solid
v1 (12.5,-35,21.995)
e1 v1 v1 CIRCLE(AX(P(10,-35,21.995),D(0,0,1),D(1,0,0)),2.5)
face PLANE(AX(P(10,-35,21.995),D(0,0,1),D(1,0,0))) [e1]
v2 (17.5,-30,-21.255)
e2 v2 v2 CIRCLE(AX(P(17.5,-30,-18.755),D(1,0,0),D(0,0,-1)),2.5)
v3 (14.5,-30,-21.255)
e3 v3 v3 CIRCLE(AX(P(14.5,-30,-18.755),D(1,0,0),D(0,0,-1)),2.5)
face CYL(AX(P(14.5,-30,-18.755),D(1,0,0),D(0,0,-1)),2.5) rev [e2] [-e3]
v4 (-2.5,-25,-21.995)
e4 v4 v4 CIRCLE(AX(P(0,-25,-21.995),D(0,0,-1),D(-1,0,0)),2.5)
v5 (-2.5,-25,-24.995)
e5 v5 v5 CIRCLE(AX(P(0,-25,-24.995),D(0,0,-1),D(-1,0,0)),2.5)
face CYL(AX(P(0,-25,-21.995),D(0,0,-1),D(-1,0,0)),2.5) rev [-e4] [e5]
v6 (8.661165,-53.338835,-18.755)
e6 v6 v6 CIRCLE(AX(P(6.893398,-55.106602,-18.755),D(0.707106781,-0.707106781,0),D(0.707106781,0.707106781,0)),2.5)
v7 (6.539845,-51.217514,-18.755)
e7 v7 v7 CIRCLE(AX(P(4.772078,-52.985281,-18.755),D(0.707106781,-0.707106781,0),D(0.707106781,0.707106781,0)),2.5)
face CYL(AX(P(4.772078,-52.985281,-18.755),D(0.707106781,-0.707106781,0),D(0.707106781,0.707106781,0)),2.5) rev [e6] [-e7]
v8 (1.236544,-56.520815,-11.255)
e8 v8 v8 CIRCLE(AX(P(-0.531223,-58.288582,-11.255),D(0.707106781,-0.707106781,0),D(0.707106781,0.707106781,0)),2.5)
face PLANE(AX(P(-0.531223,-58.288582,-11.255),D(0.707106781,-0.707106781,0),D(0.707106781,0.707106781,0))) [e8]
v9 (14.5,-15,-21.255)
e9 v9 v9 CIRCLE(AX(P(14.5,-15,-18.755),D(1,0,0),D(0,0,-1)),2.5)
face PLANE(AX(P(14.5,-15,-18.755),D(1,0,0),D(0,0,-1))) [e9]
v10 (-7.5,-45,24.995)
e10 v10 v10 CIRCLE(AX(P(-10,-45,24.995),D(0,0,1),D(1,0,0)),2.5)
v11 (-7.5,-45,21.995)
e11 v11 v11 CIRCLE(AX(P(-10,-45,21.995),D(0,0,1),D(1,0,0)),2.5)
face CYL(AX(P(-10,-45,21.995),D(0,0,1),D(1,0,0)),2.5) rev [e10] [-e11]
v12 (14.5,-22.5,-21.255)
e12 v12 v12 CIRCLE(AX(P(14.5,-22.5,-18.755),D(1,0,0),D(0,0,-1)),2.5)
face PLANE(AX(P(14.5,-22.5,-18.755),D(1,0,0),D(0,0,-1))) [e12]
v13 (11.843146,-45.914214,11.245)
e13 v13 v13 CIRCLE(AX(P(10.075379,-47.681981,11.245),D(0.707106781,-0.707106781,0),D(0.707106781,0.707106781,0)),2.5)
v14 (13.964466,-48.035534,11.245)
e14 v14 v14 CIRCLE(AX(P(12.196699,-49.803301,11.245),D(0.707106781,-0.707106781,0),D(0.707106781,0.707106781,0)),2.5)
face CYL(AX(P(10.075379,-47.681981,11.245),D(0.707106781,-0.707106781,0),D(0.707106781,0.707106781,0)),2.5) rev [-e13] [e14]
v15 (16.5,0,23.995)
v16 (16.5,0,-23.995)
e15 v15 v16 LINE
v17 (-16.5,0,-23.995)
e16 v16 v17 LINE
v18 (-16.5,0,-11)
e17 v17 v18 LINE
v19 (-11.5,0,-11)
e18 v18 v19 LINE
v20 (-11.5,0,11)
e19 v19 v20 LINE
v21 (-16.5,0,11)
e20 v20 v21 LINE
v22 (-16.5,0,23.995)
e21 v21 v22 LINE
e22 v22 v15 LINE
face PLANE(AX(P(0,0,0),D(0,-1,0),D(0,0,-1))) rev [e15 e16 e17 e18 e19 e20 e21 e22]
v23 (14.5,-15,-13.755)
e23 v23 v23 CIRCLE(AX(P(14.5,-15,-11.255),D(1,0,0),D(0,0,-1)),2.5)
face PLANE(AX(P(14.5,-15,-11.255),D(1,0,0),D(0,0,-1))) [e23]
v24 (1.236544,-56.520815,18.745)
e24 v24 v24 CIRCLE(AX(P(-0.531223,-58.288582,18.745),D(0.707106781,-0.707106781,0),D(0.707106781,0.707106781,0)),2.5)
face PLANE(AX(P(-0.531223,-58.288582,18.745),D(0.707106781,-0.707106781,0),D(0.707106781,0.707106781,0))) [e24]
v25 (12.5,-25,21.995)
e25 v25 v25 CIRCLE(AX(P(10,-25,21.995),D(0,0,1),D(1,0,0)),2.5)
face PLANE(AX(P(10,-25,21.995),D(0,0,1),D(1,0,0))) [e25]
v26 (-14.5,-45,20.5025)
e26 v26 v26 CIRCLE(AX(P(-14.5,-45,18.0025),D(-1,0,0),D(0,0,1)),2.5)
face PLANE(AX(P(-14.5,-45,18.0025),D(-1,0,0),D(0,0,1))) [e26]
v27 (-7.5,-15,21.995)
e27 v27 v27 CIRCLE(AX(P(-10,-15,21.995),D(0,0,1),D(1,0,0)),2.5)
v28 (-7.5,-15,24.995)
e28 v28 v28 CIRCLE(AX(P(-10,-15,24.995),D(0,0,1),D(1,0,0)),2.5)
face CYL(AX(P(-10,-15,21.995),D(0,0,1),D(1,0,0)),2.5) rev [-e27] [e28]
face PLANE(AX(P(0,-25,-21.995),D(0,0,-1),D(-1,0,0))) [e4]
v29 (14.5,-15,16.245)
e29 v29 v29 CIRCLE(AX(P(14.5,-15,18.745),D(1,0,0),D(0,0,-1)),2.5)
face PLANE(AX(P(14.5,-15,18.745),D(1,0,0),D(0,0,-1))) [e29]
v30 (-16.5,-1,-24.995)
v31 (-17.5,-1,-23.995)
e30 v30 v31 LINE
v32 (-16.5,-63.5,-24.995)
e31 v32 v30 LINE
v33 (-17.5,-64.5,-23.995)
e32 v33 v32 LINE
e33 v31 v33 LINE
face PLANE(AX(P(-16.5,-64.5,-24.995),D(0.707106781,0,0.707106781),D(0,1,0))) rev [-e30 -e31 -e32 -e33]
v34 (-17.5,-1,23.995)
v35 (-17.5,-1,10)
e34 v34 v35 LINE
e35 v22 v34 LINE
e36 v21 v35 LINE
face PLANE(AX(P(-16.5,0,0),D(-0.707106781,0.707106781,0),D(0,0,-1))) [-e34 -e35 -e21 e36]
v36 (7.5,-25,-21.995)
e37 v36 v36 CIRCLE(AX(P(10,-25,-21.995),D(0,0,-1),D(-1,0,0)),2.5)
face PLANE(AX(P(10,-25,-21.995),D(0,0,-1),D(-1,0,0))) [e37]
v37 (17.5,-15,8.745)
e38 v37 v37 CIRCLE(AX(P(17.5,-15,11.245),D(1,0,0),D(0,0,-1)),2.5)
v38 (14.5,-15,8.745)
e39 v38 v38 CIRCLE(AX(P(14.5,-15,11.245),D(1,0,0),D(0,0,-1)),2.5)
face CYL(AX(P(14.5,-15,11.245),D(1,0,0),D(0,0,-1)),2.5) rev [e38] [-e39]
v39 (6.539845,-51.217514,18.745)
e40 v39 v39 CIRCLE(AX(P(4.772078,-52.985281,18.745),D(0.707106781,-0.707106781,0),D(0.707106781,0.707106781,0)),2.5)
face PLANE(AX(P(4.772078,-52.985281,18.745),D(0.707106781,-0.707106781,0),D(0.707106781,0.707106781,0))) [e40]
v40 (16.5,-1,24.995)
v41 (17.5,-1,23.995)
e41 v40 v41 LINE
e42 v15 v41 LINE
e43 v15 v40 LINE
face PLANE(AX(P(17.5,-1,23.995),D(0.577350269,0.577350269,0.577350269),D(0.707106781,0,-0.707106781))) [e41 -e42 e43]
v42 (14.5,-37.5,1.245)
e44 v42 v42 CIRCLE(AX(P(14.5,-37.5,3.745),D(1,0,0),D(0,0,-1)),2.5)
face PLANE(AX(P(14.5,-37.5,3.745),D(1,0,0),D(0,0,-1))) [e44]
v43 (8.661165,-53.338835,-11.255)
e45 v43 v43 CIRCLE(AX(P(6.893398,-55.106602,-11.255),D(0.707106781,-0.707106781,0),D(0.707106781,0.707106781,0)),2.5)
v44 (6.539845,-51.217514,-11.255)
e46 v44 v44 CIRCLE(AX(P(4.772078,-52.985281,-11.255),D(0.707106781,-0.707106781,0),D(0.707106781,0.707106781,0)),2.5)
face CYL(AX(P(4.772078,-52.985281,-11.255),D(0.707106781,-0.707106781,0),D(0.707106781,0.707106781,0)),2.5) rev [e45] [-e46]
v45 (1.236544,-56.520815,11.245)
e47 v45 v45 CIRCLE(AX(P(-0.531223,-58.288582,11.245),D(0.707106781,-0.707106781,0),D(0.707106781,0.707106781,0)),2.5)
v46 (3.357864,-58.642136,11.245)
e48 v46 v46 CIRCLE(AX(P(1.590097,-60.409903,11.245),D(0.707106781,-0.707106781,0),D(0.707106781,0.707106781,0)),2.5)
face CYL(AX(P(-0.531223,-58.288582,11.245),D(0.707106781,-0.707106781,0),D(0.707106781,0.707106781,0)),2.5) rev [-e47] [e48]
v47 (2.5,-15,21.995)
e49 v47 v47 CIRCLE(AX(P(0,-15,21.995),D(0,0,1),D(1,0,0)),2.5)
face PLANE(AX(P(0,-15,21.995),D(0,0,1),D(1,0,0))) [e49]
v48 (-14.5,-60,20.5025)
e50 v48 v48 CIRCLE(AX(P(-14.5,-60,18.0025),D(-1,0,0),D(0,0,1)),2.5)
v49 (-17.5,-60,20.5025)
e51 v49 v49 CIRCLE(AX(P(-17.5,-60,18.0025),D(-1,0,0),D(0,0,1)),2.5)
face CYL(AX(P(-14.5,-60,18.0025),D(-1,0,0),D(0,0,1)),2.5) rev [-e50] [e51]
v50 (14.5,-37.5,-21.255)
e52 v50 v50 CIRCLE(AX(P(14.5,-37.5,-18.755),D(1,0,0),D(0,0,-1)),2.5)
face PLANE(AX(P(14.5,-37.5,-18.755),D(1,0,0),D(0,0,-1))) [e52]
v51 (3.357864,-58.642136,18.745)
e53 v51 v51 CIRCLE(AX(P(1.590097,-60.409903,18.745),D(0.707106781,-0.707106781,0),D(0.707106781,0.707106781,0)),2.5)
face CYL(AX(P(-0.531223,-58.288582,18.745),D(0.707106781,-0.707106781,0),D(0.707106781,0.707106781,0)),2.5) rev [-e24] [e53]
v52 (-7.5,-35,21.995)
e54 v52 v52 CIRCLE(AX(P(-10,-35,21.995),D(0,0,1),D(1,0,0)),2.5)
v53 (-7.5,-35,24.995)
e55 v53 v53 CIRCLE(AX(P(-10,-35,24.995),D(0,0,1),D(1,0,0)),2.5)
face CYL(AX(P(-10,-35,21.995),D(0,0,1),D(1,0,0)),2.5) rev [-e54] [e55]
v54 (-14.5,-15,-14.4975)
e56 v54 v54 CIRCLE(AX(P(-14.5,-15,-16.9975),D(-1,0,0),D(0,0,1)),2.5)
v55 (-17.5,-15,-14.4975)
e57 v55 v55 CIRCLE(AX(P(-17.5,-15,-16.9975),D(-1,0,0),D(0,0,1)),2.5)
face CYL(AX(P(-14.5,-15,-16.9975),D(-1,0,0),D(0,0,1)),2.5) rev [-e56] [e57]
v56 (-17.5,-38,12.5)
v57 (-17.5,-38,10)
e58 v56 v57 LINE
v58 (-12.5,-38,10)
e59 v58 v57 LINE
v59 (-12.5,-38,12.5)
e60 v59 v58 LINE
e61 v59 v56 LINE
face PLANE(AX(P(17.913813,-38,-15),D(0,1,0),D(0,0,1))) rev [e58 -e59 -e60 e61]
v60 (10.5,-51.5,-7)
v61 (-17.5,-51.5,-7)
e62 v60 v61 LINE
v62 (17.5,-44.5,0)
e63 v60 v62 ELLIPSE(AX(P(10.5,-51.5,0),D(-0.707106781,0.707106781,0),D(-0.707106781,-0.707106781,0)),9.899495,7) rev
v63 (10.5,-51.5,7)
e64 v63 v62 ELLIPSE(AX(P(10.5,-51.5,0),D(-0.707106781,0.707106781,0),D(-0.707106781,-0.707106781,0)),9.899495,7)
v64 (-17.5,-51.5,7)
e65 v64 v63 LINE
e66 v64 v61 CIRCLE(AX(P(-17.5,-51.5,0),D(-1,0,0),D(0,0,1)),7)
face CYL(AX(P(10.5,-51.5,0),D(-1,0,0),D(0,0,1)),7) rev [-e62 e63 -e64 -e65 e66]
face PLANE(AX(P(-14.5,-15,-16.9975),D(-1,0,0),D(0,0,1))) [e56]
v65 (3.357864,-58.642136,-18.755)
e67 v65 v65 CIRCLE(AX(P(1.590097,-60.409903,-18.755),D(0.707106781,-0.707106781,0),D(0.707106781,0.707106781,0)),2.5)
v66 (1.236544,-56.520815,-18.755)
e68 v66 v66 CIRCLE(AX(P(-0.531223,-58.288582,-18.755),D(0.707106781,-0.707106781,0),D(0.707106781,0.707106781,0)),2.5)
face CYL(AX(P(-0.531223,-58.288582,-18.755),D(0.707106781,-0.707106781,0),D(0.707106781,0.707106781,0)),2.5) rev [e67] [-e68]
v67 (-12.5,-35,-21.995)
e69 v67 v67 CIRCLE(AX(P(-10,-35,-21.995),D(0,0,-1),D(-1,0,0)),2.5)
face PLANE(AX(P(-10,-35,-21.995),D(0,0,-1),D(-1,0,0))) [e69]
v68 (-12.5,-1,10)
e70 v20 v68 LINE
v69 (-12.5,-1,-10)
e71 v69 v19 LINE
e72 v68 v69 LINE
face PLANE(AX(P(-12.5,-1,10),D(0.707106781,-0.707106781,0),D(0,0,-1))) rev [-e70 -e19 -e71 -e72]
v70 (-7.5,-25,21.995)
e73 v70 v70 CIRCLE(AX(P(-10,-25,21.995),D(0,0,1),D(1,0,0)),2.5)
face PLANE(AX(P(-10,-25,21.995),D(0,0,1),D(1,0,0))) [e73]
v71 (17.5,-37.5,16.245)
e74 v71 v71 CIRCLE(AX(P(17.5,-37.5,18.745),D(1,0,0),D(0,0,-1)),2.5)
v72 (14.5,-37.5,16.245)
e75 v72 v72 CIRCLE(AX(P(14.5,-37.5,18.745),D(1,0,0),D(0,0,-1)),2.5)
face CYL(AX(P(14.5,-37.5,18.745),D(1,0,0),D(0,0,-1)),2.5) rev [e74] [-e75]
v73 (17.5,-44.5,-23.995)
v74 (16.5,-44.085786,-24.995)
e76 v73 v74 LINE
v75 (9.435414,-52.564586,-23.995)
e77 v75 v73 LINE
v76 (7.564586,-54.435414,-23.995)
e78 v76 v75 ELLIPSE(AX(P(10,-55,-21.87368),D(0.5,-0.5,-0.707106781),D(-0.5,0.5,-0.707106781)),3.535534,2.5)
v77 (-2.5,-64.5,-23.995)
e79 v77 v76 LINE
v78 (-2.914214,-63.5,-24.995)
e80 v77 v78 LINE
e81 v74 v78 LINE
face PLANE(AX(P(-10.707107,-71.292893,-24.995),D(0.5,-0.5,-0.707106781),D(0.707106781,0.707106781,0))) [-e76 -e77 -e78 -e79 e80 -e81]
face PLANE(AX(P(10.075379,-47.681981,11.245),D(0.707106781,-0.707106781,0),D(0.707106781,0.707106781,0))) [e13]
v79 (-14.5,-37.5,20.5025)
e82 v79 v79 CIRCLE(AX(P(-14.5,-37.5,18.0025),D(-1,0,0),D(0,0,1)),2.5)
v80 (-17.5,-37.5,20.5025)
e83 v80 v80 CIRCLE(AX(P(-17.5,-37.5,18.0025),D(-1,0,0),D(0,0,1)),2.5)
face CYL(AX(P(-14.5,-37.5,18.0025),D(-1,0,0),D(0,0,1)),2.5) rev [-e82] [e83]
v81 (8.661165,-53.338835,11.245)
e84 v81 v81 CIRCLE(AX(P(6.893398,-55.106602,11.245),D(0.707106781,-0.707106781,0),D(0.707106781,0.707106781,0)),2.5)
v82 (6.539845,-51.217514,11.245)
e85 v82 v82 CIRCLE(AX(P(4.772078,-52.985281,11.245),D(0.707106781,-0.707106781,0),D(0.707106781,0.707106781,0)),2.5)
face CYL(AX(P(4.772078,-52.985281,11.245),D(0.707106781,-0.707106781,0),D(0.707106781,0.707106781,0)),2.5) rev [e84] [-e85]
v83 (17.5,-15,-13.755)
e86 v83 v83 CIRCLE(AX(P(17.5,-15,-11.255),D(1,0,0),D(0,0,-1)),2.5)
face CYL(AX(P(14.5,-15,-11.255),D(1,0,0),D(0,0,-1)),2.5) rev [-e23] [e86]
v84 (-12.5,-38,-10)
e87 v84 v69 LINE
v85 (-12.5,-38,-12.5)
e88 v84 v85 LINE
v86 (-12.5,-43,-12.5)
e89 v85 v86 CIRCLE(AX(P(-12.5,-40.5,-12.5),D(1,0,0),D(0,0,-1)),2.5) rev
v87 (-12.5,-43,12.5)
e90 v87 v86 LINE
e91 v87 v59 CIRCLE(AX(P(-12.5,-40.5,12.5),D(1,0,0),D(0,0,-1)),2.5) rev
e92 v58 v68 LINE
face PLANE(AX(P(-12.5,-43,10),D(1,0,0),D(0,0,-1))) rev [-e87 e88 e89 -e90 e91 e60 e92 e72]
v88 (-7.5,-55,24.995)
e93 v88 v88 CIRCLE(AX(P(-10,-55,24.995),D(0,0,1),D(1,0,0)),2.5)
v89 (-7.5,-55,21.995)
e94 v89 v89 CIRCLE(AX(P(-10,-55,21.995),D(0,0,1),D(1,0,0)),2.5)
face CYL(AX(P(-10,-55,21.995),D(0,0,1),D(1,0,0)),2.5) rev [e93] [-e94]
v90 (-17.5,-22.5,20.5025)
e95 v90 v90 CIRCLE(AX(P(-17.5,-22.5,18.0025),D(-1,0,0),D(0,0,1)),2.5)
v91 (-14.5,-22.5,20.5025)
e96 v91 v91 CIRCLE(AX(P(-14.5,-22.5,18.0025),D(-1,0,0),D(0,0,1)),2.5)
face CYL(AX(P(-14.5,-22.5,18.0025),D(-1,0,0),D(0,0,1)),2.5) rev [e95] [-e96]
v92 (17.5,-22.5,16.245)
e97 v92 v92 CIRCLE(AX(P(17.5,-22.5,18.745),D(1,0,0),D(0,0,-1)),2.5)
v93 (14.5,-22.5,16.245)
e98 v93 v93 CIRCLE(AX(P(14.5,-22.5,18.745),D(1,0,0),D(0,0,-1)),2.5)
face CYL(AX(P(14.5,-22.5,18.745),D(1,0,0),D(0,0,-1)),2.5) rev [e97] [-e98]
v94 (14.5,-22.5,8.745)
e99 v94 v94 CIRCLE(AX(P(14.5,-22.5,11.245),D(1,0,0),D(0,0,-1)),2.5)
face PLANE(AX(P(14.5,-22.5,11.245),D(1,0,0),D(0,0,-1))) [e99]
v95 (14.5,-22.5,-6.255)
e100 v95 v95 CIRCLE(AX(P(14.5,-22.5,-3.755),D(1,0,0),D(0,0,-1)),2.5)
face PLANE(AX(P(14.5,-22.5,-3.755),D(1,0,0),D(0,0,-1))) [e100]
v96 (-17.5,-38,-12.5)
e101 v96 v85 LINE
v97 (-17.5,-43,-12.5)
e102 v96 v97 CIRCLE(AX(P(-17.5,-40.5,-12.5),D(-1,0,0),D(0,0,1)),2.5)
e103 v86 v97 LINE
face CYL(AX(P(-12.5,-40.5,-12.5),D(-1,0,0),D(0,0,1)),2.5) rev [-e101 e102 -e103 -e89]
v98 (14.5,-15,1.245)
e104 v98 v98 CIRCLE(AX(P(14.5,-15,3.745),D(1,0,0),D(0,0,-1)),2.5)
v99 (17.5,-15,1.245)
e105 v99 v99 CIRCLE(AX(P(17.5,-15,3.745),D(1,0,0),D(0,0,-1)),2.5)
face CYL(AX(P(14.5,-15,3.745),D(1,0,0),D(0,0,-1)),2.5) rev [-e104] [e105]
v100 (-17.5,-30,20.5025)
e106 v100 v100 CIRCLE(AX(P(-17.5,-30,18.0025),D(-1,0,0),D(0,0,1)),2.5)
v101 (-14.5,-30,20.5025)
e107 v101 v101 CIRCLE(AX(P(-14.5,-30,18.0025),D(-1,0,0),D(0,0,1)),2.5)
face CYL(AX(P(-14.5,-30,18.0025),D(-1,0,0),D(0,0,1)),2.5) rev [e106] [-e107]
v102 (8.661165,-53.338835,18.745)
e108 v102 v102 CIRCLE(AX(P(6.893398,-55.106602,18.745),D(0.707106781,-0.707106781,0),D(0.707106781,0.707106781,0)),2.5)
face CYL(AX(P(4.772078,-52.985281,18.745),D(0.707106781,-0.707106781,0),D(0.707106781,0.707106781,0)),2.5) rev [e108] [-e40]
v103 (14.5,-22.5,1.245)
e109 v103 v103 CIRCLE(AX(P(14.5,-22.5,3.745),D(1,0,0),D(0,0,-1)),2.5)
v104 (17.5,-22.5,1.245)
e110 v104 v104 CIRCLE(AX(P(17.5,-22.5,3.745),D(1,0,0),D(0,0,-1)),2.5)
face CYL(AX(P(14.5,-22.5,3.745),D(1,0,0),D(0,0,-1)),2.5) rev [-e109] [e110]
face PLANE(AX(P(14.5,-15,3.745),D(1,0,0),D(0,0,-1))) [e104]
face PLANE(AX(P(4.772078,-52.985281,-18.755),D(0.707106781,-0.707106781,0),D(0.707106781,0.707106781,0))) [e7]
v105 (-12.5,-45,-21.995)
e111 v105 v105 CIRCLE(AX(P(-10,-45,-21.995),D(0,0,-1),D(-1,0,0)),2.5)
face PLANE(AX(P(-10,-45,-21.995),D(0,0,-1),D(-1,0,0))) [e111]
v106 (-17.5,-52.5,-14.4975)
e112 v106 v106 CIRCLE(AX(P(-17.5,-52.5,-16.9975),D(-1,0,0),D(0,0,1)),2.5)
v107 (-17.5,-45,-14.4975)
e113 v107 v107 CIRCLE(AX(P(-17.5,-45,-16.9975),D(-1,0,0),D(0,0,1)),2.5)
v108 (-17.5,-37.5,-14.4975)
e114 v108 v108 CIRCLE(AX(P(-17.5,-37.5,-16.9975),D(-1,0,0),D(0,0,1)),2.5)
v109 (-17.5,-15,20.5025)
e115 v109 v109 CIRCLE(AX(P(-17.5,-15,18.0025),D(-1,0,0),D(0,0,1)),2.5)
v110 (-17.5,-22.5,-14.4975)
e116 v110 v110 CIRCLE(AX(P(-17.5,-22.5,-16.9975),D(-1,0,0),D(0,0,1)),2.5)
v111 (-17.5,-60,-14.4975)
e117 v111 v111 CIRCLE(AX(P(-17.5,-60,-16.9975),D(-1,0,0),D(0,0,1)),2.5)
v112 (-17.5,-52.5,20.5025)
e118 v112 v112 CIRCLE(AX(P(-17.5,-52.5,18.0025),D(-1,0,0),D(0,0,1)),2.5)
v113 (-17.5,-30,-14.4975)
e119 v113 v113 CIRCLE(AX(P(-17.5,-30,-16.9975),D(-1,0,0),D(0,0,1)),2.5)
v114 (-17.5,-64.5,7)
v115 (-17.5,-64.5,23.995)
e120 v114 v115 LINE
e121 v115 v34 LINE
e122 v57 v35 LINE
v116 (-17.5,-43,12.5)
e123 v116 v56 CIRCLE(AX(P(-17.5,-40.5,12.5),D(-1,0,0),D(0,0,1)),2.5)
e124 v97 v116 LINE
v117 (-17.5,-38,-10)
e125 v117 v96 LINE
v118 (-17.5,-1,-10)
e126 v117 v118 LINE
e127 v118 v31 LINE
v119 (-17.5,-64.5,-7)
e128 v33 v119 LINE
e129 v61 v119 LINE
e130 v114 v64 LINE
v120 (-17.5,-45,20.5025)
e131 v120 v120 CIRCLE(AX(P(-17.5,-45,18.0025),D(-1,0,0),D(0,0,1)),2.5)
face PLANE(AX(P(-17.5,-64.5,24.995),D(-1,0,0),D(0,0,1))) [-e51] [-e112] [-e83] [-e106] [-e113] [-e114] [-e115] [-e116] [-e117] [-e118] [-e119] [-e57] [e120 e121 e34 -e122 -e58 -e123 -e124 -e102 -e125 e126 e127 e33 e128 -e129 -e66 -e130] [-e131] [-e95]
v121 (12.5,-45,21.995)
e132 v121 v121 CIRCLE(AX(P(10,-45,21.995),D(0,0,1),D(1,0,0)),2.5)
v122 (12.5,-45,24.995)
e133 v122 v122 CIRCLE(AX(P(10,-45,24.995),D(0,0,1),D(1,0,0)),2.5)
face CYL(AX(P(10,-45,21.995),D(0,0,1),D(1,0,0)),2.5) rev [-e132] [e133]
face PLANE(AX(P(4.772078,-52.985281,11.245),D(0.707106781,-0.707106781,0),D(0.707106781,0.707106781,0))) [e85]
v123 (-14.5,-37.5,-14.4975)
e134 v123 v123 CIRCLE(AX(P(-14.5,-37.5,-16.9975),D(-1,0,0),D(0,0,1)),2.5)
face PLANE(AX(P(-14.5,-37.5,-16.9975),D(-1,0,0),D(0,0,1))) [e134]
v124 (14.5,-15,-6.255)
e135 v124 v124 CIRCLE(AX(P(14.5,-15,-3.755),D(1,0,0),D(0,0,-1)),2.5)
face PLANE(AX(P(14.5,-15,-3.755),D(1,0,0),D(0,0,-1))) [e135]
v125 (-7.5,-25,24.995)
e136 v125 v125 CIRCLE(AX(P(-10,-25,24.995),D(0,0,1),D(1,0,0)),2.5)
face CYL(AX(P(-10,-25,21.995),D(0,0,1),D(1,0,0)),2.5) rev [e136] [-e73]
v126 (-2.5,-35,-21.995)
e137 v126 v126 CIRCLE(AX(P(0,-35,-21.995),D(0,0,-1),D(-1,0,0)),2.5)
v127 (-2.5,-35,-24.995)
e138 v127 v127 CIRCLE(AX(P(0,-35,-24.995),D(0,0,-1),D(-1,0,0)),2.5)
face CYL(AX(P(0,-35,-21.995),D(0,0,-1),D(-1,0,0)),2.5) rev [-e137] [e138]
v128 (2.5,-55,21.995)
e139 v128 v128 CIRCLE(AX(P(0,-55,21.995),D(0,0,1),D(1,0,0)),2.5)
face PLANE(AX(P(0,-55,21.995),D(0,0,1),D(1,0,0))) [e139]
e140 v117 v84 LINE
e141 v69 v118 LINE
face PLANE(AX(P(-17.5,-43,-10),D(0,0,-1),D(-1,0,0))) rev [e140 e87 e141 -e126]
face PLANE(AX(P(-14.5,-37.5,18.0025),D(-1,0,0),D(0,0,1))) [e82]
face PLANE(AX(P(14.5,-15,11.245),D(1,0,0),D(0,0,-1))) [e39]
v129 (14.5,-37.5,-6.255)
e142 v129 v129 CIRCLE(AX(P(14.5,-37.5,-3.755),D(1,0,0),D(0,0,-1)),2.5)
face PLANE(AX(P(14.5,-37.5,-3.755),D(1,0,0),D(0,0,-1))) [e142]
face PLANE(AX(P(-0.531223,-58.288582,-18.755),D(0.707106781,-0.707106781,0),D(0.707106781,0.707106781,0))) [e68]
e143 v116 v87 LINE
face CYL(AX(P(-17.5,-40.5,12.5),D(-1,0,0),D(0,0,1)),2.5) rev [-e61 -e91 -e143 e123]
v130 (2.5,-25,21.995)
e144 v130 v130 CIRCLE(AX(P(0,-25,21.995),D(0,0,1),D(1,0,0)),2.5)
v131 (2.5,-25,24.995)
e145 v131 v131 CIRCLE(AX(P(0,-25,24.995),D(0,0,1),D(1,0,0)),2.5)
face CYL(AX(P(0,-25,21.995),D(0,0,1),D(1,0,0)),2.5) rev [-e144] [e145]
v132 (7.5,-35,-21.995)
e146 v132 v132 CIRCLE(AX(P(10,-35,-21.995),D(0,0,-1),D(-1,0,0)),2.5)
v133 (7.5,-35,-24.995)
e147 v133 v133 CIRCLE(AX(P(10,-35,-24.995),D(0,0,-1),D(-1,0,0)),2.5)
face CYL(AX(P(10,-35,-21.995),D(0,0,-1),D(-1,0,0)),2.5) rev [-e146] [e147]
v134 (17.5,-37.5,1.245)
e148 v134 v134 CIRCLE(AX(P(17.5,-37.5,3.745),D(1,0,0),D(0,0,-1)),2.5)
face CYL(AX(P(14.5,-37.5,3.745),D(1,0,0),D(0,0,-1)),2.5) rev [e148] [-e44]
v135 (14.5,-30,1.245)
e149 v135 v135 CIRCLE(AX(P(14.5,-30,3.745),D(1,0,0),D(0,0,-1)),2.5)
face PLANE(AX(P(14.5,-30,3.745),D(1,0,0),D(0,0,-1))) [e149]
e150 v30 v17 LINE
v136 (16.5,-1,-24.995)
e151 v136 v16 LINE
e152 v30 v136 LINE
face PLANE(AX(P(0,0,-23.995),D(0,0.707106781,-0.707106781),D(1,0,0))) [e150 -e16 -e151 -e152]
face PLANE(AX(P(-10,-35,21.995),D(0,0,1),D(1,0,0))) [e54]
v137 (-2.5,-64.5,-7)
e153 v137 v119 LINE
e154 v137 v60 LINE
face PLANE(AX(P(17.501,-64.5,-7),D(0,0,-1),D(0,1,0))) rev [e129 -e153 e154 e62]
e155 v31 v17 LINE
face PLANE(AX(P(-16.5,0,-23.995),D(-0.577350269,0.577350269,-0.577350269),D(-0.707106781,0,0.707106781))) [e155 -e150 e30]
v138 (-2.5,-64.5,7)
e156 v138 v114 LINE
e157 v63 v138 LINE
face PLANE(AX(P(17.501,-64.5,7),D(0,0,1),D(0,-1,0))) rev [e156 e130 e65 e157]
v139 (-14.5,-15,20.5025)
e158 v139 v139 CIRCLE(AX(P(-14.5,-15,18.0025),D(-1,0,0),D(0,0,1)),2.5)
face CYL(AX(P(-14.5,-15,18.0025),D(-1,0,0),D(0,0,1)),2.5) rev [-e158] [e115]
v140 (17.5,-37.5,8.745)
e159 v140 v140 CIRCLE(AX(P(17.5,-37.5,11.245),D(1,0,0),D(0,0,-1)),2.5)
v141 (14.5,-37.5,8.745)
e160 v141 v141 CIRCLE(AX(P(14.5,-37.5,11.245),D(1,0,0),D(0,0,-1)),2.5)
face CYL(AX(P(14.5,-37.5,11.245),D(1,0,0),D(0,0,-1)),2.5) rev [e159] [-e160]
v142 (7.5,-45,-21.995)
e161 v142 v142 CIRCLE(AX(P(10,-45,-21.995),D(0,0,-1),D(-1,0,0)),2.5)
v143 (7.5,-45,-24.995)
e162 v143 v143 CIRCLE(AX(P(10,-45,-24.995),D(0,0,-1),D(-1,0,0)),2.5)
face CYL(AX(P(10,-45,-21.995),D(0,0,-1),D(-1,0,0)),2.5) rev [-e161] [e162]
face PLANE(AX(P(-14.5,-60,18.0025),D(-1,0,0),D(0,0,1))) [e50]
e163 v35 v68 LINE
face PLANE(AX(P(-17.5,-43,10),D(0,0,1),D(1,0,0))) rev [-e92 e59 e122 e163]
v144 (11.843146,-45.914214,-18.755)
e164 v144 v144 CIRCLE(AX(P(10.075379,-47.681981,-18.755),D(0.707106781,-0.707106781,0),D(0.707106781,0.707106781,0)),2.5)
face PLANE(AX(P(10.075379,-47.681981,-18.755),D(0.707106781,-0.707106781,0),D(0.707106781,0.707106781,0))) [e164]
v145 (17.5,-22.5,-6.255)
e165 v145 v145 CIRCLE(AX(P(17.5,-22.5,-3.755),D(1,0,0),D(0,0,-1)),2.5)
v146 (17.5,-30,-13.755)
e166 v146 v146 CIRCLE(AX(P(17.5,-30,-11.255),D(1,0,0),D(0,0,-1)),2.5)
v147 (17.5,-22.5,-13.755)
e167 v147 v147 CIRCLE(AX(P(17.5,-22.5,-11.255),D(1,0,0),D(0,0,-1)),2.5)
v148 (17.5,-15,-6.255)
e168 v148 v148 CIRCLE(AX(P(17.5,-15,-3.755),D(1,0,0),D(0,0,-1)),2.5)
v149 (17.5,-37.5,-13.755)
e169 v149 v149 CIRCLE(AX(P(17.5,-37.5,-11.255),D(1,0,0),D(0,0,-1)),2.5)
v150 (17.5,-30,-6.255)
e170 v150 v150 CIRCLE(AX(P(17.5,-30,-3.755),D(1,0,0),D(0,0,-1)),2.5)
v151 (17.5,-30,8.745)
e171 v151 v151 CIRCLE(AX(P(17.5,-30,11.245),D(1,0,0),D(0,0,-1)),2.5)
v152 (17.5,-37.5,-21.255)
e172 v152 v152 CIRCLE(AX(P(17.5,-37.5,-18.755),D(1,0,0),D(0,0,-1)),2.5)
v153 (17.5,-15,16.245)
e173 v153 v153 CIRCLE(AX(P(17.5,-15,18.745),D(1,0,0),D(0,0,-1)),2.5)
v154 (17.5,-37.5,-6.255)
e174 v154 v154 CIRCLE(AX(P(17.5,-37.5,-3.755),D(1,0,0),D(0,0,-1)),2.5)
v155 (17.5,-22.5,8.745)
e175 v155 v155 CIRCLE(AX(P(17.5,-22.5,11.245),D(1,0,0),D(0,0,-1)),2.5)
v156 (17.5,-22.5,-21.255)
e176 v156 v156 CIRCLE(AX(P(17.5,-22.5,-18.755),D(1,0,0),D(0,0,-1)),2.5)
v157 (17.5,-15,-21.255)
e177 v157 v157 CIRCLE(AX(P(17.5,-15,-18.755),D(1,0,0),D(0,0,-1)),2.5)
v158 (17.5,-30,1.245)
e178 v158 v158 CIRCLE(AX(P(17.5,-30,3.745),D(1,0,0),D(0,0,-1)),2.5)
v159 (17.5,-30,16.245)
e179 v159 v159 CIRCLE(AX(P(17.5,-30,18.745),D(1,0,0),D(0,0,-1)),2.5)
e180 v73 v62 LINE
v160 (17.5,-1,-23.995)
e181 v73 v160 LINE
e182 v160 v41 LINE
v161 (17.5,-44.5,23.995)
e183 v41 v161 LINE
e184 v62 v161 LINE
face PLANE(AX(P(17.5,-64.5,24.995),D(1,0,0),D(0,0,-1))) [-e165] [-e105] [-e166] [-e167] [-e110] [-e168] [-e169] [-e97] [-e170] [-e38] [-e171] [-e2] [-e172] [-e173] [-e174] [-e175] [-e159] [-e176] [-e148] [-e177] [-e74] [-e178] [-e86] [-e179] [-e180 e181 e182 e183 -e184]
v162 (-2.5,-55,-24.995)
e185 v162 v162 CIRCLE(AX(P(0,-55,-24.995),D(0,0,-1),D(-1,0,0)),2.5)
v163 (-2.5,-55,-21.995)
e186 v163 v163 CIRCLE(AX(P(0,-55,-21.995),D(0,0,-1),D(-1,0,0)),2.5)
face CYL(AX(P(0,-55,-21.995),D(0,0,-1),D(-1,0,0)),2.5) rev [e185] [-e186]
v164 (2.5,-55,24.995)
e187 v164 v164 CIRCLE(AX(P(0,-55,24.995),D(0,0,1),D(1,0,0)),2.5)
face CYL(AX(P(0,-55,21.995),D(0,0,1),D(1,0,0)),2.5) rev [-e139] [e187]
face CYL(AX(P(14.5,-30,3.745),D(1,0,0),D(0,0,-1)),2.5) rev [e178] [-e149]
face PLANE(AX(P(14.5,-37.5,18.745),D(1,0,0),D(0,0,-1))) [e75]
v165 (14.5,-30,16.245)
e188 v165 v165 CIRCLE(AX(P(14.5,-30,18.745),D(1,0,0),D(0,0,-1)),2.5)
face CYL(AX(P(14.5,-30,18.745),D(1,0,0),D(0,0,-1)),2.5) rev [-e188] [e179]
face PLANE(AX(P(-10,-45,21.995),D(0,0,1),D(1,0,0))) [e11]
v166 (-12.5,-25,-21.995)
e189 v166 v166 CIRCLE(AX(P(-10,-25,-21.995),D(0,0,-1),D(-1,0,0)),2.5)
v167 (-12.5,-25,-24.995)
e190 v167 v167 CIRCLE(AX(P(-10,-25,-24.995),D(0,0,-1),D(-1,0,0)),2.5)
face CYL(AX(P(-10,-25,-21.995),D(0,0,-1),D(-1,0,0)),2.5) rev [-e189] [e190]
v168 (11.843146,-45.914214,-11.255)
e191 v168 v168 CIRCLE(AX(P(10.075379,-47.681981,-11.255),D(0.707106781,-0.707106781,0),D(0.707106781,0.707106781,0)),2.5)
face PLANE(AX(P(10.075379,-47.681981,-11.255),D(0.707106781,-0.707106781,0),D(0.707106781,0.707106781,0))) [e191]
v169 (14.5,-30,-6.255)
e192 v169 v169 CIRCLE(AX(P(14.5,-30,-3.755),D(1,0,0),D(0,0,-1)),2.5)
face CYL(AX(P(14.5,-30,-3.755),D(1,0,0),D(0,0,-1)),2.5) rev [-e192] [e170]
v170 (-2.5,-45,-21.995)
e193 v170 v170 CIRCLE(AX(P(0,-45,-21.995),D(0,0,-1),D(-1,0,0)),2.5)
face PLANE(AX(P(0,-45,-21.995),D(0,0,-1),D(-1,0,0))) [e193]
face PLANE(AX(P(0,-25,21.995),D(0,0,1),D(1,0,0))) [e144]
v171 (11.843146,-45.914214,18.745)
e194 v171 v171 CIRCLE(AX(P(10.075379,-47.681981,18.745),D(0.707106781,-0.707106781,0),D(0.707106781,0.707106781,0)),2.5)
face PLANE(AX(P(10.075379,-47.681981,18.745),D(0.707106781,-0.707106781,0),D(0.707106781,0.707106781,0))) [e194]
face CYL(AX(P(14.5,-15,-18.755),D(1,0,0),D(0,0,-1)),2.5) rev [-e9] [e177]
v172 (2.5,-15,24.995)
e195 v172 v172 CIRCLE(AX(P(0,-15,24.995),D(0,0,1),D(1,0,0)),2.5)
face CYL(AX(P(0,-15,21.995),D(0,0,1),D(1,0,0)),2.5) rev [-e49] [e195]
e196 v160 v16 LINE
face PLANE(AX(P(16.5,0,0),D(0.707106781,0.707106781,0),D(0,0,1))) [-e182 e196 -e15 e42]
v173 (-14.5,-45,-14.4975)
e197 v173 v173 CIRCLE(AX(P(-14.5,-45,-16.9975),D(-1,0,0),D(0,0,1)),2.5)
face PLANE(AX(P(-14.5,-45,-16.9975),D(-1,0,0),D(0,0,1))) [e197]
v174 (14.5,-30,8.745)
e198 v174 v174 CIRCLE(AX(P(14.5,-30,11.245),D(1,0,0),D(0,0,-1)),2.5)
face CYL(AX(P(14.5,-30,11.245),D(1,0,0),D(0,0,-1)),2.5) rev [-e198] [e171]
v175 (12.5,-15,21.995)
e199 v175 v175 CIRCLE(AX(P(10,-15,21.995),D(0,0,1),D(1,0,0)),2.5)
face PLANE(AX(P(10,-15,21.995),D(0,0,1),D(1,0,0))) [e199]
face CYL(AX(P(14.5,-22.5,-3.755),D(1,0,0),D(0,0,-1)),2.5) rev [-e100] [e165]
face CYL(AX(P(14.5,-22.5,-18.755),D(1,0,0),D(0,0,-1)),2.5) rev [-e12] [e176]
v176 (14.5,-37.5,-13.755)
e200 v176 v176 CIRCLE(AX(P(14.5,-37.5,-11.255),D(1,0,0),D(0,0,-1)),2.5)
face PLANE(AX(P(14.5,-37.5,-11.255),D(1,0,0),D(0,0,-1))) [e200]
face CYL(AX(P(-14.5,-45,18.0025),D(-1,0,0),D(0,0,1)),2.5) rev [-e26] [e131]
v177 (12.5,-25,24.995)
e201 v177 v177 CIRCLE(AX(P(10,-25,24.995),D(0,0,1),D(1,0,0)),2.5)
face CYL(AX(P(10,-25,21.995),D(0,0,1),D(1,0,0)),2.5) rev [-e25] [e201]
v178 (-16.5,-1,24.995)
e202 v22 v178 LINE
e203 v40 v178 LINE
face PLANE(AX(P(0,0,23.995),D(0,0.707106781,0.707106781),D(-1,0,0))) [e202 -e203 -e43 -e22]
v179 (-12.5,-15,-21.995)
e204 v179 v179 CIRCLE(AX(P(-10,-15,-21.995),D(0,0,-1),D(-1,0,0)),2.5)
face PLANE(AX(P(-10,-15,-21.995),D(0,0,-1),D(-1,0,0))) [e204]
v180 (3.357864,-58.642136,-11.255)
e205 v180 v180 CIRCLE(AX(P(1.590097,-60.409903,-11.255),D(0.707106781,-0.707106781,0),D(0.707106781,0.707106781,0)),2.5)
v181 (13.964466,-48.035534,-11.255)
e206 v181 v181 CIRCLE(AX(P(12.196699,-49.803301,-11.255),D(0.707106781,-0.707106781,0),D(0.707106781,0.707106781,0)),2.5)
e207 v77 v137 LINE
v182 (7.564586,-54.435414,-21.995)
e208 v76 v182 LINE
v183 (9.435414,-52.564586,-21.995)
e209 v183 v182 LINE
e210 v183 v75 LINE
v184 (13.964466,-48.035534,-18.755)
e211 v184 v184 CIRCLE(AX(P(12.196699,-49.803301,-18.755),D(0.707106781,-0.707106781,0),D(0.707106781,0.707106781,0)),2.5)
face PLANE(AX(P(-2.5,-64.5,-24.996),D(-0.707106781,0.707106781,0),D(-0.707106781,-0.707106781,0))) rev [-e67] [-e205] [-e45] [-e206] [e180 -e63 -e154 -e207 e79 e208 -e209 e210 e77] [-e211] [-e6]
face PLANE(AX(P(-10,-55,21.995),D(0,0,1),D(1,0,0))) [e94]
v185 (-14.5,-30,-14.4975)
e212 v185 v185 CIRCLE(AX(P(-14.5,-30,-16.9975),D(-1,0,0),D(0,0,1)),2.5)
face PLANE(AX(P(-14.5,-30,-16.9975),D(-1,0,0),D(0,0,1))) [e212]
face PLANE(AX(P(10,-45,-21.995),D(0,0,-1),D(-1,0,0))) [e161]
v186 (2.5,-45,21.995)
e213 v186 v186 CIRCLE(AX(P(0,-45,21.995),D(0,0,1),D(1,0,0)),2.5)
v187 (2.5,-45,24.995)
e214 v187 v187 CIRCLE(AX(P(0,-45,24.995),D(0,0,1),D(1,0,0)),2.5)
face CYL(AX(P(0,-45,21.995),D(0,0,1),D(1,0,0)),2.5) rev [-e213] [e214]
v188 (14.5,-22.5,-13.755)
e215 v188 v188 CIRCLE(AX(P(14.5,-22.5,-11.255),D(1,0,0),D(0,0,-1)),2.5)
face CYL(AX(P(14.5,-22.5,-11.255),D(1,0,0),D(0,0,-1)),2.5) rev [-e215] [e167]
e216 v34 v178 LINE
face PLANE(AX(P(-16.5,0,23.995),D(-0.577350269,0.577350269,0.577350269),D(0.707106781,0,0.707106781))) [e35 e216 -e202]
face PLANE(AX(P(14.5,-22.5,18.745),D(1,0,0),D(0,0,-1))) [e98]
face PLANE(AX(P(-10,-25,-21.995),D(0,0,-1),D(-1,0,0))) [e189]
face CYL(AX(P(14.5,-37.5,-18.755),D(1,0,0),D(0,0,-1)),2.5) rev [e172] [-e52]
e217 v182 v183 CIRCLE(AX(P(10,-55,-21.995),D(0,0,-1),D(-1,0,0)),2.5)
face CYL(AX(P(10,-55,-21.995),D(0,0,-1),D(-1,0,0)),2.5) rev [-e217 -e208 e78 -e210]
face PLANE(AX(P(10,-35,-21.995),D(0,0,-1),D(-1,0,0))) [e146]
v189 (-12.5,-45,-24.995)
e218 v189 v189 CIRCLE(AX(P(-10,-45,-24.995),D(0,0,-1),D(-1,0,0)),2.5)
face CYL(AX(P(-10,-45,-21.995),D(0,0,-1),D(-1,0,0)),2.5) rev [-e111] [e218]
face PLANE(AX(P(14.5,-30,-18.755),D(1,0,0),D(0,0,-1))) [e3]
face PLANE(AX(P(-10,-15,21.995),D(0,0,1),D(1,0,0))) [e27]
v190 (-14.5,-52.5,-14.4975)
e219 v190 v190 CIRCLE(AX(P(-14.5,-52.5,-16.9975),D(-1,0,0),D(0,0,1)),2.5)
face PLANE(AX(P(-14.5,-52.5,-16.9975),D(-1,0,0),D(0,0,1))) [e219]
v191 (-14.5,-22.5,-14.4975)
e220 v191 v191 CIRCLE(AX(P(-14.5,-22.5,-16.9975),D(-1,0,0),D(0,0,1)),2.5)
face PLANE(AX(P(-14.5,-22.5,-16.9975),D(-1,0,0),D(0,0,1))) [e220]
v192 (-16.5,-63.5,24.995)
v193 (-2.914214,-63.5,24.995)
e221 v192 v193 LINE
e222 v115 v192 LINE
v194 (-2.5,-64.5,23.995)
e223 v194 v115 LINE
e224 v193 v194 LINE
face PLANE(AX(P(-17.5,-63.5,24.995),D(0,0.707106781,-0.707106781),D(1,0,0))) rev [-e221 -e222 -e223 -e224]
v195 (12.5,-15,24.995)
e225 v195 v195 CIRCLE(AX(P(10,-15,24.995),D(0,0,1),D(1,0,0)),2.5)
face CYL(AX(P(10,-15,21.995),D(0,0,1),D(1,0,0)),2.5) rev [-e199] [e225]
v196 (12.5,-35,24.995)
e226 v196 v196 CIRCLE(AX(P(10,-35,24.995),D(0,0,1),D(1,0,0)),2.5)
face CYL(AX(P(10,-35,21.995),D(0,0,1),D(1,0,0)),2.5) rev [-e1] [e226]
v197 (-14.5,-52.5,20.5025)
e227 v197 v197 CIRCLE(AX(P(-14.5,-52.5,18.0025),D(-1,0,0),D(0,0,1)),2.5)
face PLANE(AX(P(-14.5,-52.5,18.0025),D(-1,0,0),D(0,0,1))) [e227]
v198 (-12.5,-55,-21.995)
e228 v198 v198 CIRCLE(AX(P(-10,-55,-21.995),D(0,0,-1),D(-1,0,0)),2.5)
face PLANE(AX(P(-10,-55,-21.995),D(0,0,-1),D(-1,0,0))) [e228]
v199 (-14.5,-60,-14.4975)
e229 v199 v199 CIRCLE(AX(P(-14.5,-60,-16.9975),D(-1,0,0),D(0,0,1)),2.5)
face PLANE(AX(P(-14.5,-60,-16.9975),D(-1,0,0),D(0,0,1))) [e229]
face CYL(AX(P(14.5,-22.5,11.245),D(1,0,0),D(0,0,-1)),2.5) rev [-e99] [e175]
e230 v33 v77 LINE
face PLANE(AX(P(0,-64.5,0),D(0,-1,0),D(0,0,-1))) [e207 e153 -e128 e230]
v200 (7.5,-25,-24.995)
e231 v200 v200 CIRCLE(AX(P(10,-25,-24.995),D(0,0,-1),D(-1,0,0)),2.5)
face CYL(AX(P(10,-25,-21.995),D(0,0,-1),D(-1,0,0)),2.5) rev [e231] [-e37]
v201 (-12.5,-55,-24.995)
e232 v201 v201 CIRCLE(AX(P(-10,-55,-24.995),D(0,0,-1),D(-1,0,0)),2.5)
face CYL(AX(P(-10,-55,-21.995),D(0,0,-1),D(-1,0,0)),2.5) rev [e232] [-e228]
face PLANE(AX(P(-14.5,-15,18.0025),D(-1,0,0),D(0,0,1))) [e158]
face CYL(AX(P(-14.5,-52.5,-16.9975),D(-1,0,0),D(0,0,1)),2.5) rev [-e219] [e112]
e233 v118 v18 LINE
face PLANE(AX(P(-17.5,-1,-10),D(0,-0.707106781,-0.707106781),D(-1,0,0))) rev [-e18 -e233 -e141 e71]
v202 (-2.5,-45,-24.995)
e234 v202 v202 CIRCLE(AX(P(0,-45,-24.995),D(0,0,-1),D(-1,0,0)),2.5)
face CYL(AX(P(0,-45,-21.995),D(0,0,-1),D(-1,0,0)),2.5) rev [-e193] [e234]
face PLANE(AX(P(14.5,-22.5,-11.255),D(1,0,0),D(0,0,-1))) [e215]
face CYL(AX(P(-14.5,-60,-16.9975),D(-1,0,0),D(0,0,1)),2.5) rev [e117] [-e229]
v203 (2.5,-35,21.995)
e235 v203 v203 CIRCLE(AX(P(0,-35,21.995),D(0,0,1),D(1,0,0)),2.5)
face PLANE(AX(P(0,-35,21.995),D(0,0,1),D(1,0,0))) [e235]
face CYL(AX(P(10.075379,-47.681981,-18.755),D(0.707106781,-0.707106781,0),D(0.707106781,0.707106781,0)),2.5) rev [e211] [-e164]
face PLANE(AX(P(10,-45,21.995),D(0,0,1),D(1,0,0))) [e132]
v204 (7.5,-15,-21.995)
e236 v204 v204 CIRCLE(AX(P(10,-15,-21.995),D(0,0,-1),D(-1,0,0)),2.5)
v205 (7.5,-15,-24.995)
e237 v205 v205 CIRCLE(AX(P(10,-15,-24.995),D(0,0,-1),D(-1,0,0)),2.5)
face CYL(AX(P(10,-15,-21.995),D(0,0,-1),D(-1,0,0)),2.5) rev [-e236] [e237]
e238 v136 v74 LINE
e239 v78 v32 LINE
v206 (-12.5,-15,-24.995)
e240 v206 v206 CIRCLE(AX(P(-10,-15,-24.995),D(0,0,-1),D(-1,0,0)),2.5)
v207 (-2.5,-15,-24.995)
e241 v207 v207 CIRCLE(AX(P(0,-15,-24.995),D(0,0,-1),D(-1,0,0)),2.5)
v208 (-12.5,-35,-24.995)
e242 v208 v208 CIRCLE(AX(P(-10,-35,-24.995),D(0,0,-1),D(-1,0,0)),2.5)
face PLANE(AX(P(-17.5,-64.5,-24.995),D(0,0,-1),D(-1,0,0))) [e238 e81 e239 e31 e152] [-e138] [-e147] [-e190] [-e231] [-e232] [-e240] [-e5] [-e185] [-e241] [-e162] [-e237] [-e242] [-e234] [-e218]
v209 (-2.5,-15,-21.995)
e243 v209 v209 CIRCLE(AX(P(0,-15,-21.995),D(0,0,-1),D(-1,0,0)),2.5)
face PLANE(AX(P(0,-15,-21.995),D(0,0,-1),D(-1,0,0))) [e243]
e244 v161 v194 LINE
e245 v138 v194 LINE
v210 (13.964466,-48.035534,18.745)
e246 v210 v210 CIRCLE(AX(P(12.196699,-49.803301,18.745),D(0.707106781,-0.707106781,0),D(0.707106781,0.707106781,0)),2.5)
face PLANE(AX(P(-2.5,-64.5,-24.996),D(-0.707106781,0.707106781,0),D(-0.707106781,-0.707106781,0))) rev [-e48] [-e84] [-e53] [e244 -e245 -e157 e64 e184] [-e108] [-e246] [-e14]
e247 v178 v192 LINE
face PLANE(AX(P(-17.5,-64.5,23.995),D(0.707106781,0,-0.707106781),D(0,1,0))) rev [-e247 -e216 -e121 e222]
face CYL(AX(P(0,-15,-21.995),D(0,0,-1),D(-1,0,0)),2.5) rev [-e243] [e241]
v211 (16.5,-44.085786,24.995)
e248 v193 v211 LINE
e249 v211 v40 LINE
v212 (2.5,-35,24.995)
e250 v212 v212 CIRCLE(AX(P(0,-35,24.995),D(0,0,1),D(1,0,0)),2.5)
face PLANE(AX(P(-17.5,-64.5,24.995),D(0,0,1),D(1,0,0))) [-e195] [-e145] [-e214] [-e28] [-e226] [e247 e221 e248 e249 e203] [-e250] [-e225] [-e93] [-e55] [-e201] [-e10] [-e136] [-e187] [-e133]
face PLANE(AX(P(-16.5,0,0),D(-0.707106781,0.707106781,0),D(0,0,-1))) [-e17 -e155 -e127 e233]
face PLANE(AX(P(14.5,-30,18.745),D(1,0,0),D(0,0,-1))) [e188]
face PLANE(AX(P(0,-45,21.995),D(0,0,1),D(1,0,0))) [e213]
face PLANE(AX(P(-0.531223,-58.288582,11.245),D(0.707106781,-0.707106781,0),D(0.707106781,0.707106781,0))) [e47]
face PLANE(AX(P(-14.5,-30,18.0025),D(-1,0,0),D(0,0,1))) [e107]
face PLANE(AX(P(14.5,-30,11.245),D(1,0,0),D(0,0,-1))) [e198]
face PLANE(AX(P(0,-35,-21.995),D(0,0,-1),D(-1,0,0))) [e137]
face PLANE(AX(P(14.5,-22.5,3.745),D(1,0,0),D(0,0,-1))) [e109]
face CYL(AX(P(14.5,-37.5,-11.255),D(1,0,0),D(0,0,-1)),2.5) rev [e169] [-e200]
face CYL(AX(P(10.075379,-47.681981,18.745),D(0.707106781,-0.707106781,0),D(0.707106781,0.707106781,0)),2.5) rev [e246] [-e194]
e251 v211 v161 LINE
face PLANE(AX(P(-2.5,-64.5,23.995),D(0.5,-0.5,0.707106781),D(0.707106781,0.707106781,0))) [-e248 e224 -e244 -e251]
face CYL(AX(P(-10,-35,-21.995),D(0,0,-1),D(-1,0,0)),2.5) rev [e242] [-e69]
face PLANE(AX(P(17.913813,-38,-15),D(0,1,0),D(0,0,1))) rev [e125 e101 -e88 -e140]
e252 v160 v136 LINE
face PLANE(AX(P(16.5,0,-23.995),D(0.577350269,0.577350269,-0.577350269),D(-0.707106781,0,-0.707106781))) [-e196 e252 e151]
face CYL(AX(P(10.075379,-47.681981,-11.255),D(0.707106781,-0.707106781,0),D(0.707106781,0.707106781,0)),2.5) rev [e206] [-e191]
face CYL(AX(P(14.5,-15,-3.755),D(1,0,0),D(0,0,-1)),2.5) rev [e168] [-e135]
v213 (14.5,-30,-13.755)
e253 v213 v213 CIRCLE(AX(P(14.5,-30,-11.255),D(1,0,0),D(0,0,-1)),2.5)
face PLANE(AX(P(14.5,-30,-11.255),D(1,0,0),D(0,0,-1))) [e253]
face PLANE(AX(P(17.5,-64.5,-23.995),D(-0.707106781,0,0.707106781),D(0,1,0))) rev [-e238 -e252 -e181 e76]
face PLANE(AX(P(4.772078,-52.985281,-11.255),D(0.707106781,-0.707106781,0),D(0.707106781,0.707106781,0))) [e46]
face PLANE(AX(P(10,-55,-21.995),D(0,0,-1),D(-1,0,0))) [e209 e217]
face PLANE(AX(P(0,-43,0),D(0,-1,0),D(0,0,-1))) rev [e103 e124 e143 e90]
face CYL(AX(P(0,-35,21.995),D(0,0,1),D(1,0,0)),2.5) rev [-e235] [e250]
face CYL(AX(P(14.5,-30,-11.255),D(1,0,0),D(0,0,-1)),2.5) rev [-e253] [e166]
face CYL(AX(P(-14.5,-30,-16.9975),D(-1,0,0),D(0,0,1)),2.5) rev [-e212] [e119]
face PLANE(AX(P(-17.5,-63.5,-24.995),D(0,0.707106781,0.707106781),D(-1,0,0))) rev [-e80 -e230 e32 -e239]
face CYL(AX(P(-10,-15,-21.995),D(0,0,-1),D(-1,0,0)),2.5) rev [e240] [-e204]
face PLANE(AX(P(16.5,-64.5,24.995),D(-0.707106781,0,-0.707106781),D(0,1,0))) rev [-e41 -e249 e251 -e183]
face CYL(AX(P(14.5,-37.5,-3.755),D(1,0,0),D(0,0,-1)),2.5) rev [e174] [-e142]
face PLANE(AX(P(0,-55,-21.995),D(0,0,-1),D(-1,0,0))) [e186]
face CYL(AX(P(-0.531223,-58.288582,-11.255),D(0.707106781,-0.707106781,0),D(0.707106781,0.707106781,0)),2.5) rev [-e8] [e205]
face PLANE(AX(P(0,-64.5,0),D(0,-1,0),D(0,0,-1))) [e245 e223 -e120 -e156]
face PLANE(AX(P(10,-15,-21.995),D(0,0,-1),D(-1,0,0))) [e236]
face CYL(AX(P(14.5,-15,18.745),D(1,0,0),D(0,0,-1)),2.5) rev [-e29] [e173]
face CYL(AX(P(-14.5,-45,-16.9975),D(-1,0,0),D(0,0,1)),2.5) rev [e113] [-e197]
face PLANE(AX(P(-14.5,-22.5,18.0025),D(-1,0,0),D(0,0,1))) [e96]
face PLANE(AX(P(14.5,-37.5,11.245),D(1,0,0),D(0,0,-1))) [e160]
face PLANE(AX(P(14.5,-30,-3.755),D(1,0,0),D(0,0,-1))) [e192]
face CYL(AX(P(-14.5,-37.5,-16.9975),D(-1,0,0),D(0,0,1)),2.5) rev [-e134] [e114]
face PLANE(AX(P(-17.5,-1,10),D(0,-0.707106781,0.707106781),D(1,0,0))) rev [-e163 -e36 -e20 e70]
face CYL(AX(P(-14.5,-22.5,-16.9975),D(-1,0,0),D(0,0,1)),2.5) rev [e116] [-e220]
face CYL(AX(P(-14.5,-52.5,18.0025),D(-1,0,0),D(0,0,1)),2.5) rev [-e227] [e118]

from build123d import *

# Parameters (mm, degrees)
SKETCH1_W            = 35
SKETCH1_H            = 49.99
BOSS_EXTRUDE1_DEPTH  = 64.5
CUT_EXTRUDE1_REACH   = 85.46
CUT_EXTRUDE2_REACH   = 79.524
SKETCH3_W            = 14
SKETCH3_H            = 20
FILLET1_R            = 7
SKETCH4_W            = 5
SKETCH4_H            = 20
CUT_EXTRUDE3_DEPTH   = 43
SKETCH5_W            = 30
SKETCH5_H            = 5
CUT_EXTRUDE4_DEPTH   = 5
FILLET5_R            = 2.5
FILLET6_R            = 2.5
CHAMFER1_SIZE        = 1
SKETCH6_R            = 2.5
CUT_EXTRUDE5_DEPTH   = 3
LPATTERN1_COUNT      = 3
LPATTERN1_PITCH      = 10
LPATTERN1_COUNT_DIR2 = 5
LPATTERN1_PITCH_DIR2 = 10
SKETCH9_R            = 2.5
CUT_EXTRUDE20_DEPTH  = 3
LPATTERN2_COUNT      = 4
LPATTERN2_PITCH      = 7.5
LPATTERN2_COUNT_DIR2 = 6
LPATTERN2_PITCH_DIR2 = 7.5
SKETCH10_R           = 2.5
CUT_EXTRUDE21_DEPTH  = 3
LPATTERN3_COUNT      = 7
LPATTERN3_PITCH      = 7.5
LPATTERN3_COUNT_DIR2 = 2
LPATTERN3_PITCH_DIR2 = 35
SKETCH11_R           = 2.5
CUT_EXTRUDE23_DEPTH  = 3
LPATTERN5_COUNT      = 6
LPATTERN5_PITCH      = 7.5
LPATTERN5_COUNT_DIR2 = 3
LPATTERN5_PITCH_DIR2 = 7.5
CUT_EXTRUDE25_START  = -3
SKETCH18_R           = 2.5
CUT_EXTRUDE25_DEPTH  = 3
LPATTERN7_COUNT      = 3
LPATTERN7_PITCH      = 10
LPATTERN7_COUNT_DIR2 = 5
LPATTERN7_PITCH_DIR2 = 10


with BuildPart() as part:
    # Sketch1 → Boss-Extrude1 (new body)
    with BuildSketch(Plane(origin=(0, 0, 0), x_dir=(1, 0, 0), z_dir=(0, 1, 0))):
        Rectangle(SKETCH1_W, SKETCH1_H)
    extrude(amount=-BOSS_EXTRUDE1_DEPTH)

    # Sketch2 → Cut-Extrude1 (cut, up to next)
    with BuildSketch(Plane.XY.offset(24.995), mode=Mode.PRIVATE) as cut_extrude1_sk1:
        Polygon((-2.5, -64.5), (17.5, -44.5), (17.5, -64.5), align=None)
    cut_extrude1_tool1 = extrude(cut_extrude1_sk1.sketch, amount=-CUT_EXTRUDE1_REACH, mode=Mode.PRIVATE) & part.part
    add(cut_extrude1_tool1.solids().sort_by_distance((10.833333, -57.833333, 24.995))[0], mode=Mode.SUBTRACT)

    # Sketch3 → Cut-Extrude2 (cut, up to next)
    with BuildSketch(Plane.ZY.offset(17.5), mode=Mode.PRIVATE) as cut_extrude2_sk1:
        with Locations((0, -54.5)):
            Rectangle(SKETCH3_W, SKETCH3_H)
    cut_extrude2_tool1 = extrude(cut_extrude2_sk1.sketch, amount=-CUT_EXTRUDE2_REACH, mode=Mode.PRIVATE) & part.part
    add(cut_extrude2_tool1.solids().sort_by_distance((-17.5, -54.5, 0))[0], mode=Mode.SUBTRACT)

    # Fillet1
    fillet1_edges = [part.edges().sort_by_distance(p)[0] for p in [
        (0, -44.5, -7),
        (0, -44.5, 7),
    ]]
    fillet(fillet1_edges, radius=FILLET1_R - 0.0001)  # a hair under: the kernel refuses the full size

    # Sketch4 → Cut-Extrude3 (cut)
    with BuildSketch(Plane(origin=(0, 0, 0), x_dir=(1, 0, 0), z_dir=(0, 1, 0))):
        with Locations((-15, 0)):
            Rectangle(SKETCH4_W, SKETCH4_H)
    extrude(amount=-CUT_EXTRUDE3_DEPTH, mode=Mode.SUBTRACT)

    # Sketch5 → Cut-Extrude4 (cut)
    with BuildSketch(Plane.ZY.offset(17.5)):
        with Locations((0, -40.5)):
            Rectangle(SKETCH5_W, SKETCH5_H)
    extrude(amount=-CUT_EXTRUDE4_DEPTH, mode=Mode.SUBTRACT)

    # Fillet5
    fillet5_edges = [part.edges().sort_by_distance(p)[0] for p in [
        (-15, -38, -15),
        (-15, -43, -15),
    ]]
    fillet(fillet5_edges, radius=FILLET5_R - 0.0001)  # a hair under: the kernel refuses the full size

    # Fillet6
    fillet6_edges = [part.edges().sort_by_distance(p)[0] for p in [
        (-15, -43, 15),
        (-15, -38, 15),
    ]]
    fillet(fillet6_edges, radius=FILLET6_R - 0.0001)  # a hair under: the kernel refuses the full size

    # Chamfer1
    chamfer1_edges = [part.edges().sort_by_distance(p)[0] for p in [
        (-10, -64.5, -24.995),
        (17.5, -22.25, -24.995),
        (17.5, -22.25, 24.995),
        (-10, -64.5, 24.995),
        (7.5, -54.5, -24.995),
        (7.5, -54.5, 24.995),
        (0, 0, 24.995),
        (-17.5, 0, -17.4975),
        (-17.5, 0, 17.4975),
        (0, 0, -24.995),
        (17.5, 0, 0),
        (-15, 0, 10),
        (-12.5, 0, 0),
        (-15, 0, -10),
        (-17.5, -32.25, 24.995),
        (-17.5, -32.25, -24.995),
    ]]
    chamfer(chamfer1_edges, length=CHAMFER1_SIZE)

    # Sketch6 → Cut-Extrude5 (cut)
    with BuildSketch(Plane.XY.offset(24.995)):
        with Locations((-10, -15)):
            Circle(SKETCH6_R)
    cut_extrude5 = extrude(amount=-CUT_EXTRUDE5_DEPTH, mode=Mode.SUBTRACT)

    # LPattern1: Cut-Extrude5 3 × 5, 1 skipped
    with Locations(*[(i * LPATTERN1_PITCH, -j * LPATTERN1_PITCH_DIR2, 0) for i in range(LPATTERN1_COUNT) for j in range(LPATTERN1_COUNT_DIR2) if (i, j) not in ((0, 0), (2, 4))]):
        add(cut_extrude5, mode=Mode.SUBTRACT)

    # Sketch9 → Cut-Extrude20 (cut)
    with BuildSketch(Plane(origin=(17.5, 0, 0), x_dir=(0, 0, -1), z_dir=(1, 0, 0))):
        with Locations((-18.745, -15)):
            Circle(SKETCH9_R)
    cut_extrude20 = extrude(amount=-CUT_EXTRUDE20_DEPTH, mode=Mode.SUBTRACT)

    # LPattern2: Cut-Extrude20 4 × 6
    with Locations(*[(0, -i * LPATTERN2_PITCH, -j * LPATTERN2_PITCH_DIR2) for i in range(LPATTERN2_COUNT) for j in range(LPATTERN2_COUNT_DIR2) if (i, j) != (0, 0)]):
        add(cut_extrude20, mode=Mode.SUBTRACT)

    # Sketch10 → Cut-Extrude21 (cut)
    with BuildSketch(Plane.ZY.offset(17.5)):
        with Locations((-16.9975, -15)):
            Circle(SKETCH10_R)
    cut_extrude21 = extrude(amount=-CUT_EXTRUDE21_DEPTH, mode=Mode.SUBTRACT)

    # LPattern3: Cut-Extrude21 7 × 2
    with Locations(*[(0, -i * LPATTERN3_PITCH, j * LPATTERN3_PITCH_DIR2) for i in range(LPATTERN3_COUNT) for j in range(LPATTERN3_COUNT_DIR2) if (i, j) != (0, 0)]):
        add(cut_extrude21, mode=Mode.SUBTRACT)

    # Sketch11 → Cut-Extrude23 (cut)
    with BuildSketch(Plane(origin=(31, -31, 0), x_dir=(0, 0, -1), z_dir=(0.707106781186544, -0.7071067811865511, 0))):
        with Locations(Location((-18.745, -26.591883092, 0), (0, 0, 90))):
            Circle(SKETCH11_R)
    cut_extrude23 = extrude(amount=-CUT_EXTRUDE23_DEPTH, mode=Mode.SUBTRACT)

    # LPattern5: Cut-Extrude23 6 × 3, 6 skipped
    with Locations(*[Vector(0, 0, -1) * (i * LPATTERN5_PITCH) + Vector(-0.707106781186551, -0.707106781186544, 0) * (j * LPATTERN5_PITCH_DIR2) for i in range(LPATTERN5_COUNT) for j in range(LPATTERN5_COUNT_DIR2) if (i, j) not in ((0, 0), (2, 0), (2, 1), (2, 2), (3, 0), (3, 1), (3, 2))]):
        add(cut_extrude23, mode=Mode.SUBTRACT)

    # Sketch18 → Cut-Extrude25 (cut)
    with BuildSketch(Plane(origin=(0, 0, -24.995), x_dir=(-1, 0, 0), z_dir=(0, 0, -1)).offset(CUT_EXTRUDE25_START)):
        with Locations(Location((10, -15, 0), (0, 0, 180))):
            Circle(SKETCH18_R)
    cut_extrude25 = extrude(amount=CUT_EXTRUDE25_DEPTH, mode=Mode.SUBTRACT)

    # LPattern7: Cut-Extrude25 3 × 5
    with Locations(*[(i * LPATTERN7_PITCH, -j * LPATTERN7_PITCH_DIR2, 0) for i in range(LPATTERN7_COUNT) for j in range(LPATTERN7_COUNT_DIR2) if (i, j) != (0, 0)]):
        add(cut_extrude25, mode=Mode.SUBTRACT)


solid = part.part
